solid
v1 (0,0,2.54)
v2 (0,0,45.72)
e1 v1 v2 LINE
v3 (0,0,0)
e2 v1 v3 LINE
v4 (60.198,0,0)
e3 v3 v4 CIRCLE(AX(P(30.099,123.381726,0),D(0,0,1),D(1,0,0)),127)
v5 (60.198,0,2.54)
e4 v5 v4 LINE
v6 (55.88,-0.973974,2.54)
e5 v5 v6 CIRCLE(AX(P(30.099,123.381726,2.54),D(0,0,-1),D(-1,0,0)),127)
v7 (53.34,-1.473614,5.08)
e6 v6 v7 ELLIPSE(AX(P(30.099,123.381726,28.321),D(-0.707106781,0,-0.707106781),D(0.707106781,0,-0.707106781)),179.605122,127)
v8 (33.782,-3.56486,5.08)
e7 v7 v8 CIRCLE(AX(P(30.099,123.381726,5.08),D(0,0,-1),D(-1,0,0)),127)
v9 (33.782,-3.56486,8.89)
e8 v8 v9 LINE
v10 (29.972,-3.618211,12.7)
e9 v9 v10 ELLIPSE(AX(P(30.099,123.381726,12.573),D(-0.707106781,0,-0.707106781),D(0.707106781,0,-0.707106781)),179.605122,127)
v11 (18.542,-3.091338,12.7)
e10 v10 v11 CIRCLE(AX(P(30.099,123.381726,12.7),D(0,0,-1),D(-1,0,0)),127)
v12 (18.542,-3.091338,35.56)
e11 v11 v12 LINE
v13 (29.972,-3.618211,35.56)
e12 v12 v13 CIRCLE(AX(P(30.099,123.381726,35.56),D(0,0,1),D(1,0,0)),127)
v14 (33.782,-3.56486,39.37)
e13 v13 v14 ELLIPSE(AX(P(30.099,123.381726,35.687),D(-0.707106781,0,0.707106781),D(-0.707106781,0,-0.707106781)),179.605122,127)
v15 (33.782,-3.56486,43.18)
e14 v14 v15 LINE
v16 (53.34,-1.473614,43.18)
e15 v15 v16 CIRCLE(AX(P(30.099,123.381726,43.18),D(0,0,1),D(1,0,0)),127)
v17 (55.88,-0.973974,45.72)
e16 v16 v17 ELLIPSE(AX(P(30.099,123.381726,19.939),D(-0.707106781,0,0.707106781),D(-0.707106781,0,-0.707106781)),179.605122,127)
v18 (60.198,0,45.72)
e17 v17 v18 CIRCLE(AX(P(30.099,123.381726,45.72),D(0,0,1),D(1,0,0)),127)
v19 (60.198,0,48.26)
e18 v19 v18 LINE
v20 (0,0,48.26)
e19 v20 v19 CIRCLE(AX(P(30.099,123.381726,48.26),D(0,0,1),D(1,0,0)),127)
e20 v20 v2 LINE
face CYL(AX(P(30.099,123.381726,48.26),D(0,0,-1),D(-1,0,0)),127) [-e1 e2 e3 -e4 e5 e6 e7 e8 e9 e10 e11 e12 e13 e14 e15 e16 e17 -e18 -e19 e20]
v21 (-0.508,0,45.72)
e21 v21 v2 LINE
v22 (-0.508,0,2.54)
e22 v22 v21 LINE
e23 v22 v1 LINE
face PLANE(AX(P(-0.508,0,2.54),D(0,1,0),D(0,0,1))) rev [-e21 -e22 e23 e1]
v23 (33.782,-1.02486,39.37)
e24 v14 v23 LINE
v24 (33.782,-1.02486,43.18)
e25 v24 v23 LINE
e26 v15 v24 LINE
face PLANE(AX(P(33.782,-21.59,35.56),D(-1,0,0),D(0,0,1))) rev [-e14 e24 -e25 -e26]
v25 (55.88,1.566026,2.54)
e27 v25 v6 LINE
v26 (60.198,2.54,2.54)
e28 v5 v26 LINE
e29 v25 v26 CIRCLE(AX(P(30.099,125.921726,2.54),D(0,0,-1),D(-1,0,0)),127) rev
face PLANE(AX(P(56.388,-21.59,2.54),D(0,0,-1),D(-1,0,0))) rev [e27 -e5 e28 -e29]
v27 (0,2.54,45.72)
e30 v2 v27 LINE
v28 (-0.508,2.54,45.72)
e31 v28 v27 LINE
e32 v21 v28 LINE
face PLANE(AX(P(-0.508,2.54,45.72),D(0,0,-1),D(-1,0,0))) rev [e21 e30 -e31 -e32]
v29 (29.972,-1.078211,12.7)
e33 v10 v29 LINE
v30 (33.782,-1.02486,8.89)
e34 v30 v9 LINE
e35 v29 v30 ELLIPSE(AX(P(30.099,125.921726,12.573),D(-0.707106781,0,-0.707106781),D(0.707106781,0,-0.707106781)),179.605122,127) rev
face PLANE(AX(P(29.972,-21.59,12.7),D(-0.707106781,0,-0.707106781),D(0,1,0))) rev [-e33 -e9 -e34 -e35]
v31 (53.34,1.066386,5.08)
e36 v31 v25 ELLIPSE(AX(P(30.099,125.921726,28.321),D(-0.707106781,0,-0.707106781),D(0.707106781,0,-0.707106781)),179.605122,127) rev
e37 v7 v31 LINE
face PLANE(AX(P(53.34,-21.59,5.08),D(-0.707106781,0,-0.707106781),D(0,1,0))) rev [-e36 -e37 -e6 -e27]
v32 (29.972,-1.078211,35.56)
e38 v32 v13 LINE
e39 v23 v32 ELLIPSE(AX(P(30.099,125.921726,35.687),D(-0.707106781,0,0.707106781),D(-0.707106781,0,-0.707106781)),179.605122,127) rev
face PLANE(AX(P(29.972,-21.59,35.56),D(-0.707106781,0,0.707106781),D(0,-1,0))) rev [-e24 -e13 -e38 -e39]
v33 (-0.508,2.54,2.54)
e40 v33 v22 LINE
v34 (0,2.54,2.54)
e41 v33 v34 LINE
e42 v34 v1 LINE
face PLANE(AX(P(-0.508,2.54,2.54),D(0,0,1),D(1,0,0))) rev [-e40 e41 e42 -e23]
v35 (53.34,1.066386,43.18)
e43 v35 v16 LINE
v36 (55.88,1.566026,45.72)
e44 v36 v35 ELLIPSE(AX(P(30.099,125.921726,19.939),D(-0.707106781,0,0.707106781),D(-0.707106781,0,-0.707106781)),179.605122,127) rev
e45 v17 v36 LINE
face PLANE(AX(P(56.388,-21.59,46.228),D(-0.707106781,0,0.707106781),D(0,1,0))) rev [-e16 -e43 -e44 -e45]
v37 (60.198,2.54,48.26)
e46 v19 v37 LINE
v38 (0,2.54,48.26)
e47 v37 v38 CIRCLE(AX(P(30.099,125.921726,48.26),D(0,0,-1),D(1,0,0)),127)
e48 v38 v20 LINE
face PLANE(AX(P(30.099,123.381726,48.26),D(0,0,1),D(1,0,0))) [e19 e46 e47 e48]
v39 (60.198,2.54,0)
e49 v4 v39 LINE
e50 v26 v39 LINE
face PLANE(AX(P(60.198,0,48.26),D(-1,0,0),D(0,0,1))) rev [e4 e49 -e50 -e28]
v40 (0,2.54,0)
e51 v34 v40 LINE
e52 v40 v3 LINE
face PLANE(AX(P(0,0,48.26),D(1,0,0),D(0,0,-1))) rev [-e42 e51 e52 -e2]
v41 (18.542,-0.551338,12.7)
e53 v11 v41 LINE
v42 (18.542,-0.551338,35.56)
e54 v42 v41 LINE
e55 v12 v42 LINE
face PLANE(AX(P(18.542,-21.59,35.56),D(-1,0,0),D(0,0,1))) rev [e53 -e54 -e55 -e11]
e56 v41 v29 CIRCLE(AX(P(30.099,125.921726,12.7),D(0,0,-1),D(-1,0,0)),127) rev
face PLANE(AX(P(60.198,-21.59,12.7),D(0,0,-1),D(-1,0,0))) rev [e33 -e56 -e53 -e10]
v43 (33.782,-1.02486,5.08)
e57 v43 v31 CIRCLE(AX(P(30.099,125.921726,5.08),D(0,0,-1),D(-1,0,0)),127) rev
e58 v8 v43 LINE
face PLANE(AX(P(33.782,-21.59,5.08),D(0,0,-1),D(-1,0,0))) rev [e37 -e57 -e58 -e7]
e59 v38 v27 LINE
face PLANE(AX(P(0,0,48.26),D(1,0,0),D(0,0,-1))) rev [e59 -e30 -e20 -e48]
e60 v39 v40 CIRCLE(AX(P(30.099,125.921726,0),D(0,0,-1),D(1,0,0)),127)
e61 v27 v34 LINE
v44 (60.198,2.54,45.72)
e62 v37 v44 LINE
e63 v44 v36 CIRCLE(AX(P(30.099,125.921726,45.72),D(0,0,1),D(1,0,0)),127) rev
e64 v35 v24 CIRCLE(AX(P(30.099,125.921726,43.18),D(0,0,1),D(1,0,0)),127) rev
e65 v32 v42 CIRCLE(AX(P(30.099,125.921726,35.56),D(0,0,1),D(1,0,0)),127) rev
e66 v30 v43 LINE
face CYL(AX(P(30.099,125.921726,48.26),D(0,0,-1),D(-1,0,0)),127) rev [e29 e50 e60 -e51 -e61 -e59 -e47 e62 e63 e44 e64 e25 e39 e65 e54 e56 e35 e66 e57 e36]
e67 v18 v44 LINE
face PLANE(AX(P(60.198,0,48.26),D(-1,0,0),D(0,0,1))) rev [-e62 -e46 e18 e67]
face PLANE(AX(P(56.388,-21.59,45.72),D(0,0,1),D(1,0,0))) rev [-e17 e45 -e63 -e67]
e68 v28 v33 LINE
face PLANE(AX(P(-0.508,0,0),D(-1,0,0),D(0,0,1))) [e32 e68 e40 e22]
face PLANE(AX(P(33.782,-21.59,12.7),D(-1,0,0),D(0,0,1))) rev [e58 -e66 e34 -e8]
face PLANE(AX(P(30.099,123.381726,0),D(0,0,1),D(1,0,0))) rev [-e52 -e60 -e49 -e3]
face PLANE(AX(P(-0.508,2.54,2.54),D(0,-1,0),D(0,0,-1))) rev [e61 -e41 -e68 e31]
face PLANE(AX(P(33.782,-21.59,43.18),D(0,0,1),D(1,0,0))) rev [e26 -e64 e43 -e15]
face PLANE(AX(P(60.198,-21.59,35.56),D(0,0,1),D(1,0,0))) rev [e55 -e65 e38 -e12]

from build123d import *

# Parameters (mm, degrees)
BOSS_EXTRUDE1_DEPTH = 48.26
SKETCH4_W           = 41.656
SKETCH4_H           = 22.86
CUT_EXTRUDE1_DEPTH  = 25.4
CUT_EXTRUDE2_DEPTH  = 25.4
SKETCH6_W           = 43.18
SKETCH6_H           = 2.54
BOSS_EXTRUDE2_DEPTH = 0.508
CHAMFER2_SIZE       = 3.048
CHAMFER3_SIZE       = 3.81


with BuildPart() as part:
    # Sketch1 → Boss-Extrude1 (new body)
    with BuildSketch(Plane.XY):
        with BuildLine():
            Line((0, 0), (0, 2.54))
            ThreePointArc((0, 2.54), (30.099, -1.078274453), (60.198, 2.54))
            Line((60.198, 2.54), (60.198, 0))
            ThreePointArc((60.198, 0), (30.099, -3.618274453), (0, 0))
        make_face()
    extrude(amount=BOSS_EXTRUDE1_DEPTH)

    # Sketch4 → Cut-Extrude1 (cut)
    with BuildSketch(Plane(origin=(0, 3.81, 0), x_dir=(1, 0, 0), z_dir=(0, 1, 0))):
        with Locations((39.37, -24.13)):
            Rectangle(SKETCH4_W, SKETCH4_H)
    extrude(amount=-CUT_EXTRUDE1_DEPTH, mode=Mode.SUBTRACT)

    # Sketch5 → Cut-Extrude2 (cut)
    with BuildSketch(Plane(origin=(0, 3.81, 0), x_dir=(1, 0, 0), z_dir=(0, 1, 0))):
        Polygon((33.782, -12.7), (33.782, -5.08), (56.388, -5.08), (56.388, -2.54), (60.198, -2.54), (60.198, -3.81), (60.198, -12.7), align=None)
        Polygon((33.782, -35.56), (60.198, -35.56), (60.198, -45.72), (56.388, -45.72), (56.388, -43.18), (33.782, -43.18), align=None)
    extrude(amount=-CUT_EXTRUDE2_DEPTH, mode=Mode.SUBTRACT)

    # Sketch6 → Boss-Extrude2 (add)
    with BuildSketch(Plane.ZY):
        with Locations((24.13, 1.27)):
            Rectangle(SKETCH6_W, SKETCH6_H)
    extrude(amount=BOSS_EXTRUDE2_DEPTH)

    # Chamfer2
    # the kernel refuses this chamfer: 3.048 mm, written as the material it takes off along each edge
    with BuildSketch(Plane(origin=(56.388, 9.510915582, 43.18), x_dir=(0.02749587661058498, 0, 0.9996219169112968), z_dir=(0, -1, 0))) as chamfer2_piece_1_section:
        Polygon((CHAMFER2_SIZE * 0.999621916911, CHAMFER2_SIZE * 0.0274958766106), (-CHAMFER2_SIZE * 0.0274958766106, CHAMFER2_SIZE * 0.999621916911), (0, 0), align=None)
    chamfer2_piece_1 = extrude(amount=18.216979495, mode=Mode.PRIVATE)
    chamfer2_piece_1 = split(chamfer2_piece_1, bisect_by=Plane(origin=(55.345503153, 0.402425835, 45.72), z_dir=(0, 0, -1)), keep=Keep.TOP, mode=Mode.PRIVATE)
    add(chamfer2_piece_1, mode=Mode.SUBTRACT)
    with BuildSketch(Plane(origin=(56.388, 9.510915582, 5.08), x_dir=(-0.9996219169112968, 0, 0.027495876610586396), z_dir=(0, -1, 0))) as chamfer2_piece_2_section:
        Polygon((CHAMFER2_SIZE * 0.999621916911, CHAMFER2_SIZE * 0.0274958766106), (-CHAMFER2_SIZE * 0.0274958766106, CHAMFER2_SIZE * 0.999621916911), (0, 0), align=None)
    chamfer2_piece_2 = extrude(amount=18.216979495, mode=Mode.PRIVATE)
    chamfer2_piece_2 = split(chamfer2_piece_2, bisect_by=Plane(origin=(55.345503153, 0.402425835, 2.54), z_dir=(0, 0, 1)), keep=Keep.TOP, mode=Mode.PRIVATE)
    add(chamfer2_piece_2, mode=Mode.SUBTRACT)

    # Chamfer3
    chamfer3_edges = [part.edges().sort_by_distance(p)[0] for p in [
        (33.782, -2.29485972, 12.7),
        (33.782, -2.29485972, 35.56),
    ]]
    chamfer(chamfer3_edges, length=CHAMFER3_SIZE)


solid = part.part
